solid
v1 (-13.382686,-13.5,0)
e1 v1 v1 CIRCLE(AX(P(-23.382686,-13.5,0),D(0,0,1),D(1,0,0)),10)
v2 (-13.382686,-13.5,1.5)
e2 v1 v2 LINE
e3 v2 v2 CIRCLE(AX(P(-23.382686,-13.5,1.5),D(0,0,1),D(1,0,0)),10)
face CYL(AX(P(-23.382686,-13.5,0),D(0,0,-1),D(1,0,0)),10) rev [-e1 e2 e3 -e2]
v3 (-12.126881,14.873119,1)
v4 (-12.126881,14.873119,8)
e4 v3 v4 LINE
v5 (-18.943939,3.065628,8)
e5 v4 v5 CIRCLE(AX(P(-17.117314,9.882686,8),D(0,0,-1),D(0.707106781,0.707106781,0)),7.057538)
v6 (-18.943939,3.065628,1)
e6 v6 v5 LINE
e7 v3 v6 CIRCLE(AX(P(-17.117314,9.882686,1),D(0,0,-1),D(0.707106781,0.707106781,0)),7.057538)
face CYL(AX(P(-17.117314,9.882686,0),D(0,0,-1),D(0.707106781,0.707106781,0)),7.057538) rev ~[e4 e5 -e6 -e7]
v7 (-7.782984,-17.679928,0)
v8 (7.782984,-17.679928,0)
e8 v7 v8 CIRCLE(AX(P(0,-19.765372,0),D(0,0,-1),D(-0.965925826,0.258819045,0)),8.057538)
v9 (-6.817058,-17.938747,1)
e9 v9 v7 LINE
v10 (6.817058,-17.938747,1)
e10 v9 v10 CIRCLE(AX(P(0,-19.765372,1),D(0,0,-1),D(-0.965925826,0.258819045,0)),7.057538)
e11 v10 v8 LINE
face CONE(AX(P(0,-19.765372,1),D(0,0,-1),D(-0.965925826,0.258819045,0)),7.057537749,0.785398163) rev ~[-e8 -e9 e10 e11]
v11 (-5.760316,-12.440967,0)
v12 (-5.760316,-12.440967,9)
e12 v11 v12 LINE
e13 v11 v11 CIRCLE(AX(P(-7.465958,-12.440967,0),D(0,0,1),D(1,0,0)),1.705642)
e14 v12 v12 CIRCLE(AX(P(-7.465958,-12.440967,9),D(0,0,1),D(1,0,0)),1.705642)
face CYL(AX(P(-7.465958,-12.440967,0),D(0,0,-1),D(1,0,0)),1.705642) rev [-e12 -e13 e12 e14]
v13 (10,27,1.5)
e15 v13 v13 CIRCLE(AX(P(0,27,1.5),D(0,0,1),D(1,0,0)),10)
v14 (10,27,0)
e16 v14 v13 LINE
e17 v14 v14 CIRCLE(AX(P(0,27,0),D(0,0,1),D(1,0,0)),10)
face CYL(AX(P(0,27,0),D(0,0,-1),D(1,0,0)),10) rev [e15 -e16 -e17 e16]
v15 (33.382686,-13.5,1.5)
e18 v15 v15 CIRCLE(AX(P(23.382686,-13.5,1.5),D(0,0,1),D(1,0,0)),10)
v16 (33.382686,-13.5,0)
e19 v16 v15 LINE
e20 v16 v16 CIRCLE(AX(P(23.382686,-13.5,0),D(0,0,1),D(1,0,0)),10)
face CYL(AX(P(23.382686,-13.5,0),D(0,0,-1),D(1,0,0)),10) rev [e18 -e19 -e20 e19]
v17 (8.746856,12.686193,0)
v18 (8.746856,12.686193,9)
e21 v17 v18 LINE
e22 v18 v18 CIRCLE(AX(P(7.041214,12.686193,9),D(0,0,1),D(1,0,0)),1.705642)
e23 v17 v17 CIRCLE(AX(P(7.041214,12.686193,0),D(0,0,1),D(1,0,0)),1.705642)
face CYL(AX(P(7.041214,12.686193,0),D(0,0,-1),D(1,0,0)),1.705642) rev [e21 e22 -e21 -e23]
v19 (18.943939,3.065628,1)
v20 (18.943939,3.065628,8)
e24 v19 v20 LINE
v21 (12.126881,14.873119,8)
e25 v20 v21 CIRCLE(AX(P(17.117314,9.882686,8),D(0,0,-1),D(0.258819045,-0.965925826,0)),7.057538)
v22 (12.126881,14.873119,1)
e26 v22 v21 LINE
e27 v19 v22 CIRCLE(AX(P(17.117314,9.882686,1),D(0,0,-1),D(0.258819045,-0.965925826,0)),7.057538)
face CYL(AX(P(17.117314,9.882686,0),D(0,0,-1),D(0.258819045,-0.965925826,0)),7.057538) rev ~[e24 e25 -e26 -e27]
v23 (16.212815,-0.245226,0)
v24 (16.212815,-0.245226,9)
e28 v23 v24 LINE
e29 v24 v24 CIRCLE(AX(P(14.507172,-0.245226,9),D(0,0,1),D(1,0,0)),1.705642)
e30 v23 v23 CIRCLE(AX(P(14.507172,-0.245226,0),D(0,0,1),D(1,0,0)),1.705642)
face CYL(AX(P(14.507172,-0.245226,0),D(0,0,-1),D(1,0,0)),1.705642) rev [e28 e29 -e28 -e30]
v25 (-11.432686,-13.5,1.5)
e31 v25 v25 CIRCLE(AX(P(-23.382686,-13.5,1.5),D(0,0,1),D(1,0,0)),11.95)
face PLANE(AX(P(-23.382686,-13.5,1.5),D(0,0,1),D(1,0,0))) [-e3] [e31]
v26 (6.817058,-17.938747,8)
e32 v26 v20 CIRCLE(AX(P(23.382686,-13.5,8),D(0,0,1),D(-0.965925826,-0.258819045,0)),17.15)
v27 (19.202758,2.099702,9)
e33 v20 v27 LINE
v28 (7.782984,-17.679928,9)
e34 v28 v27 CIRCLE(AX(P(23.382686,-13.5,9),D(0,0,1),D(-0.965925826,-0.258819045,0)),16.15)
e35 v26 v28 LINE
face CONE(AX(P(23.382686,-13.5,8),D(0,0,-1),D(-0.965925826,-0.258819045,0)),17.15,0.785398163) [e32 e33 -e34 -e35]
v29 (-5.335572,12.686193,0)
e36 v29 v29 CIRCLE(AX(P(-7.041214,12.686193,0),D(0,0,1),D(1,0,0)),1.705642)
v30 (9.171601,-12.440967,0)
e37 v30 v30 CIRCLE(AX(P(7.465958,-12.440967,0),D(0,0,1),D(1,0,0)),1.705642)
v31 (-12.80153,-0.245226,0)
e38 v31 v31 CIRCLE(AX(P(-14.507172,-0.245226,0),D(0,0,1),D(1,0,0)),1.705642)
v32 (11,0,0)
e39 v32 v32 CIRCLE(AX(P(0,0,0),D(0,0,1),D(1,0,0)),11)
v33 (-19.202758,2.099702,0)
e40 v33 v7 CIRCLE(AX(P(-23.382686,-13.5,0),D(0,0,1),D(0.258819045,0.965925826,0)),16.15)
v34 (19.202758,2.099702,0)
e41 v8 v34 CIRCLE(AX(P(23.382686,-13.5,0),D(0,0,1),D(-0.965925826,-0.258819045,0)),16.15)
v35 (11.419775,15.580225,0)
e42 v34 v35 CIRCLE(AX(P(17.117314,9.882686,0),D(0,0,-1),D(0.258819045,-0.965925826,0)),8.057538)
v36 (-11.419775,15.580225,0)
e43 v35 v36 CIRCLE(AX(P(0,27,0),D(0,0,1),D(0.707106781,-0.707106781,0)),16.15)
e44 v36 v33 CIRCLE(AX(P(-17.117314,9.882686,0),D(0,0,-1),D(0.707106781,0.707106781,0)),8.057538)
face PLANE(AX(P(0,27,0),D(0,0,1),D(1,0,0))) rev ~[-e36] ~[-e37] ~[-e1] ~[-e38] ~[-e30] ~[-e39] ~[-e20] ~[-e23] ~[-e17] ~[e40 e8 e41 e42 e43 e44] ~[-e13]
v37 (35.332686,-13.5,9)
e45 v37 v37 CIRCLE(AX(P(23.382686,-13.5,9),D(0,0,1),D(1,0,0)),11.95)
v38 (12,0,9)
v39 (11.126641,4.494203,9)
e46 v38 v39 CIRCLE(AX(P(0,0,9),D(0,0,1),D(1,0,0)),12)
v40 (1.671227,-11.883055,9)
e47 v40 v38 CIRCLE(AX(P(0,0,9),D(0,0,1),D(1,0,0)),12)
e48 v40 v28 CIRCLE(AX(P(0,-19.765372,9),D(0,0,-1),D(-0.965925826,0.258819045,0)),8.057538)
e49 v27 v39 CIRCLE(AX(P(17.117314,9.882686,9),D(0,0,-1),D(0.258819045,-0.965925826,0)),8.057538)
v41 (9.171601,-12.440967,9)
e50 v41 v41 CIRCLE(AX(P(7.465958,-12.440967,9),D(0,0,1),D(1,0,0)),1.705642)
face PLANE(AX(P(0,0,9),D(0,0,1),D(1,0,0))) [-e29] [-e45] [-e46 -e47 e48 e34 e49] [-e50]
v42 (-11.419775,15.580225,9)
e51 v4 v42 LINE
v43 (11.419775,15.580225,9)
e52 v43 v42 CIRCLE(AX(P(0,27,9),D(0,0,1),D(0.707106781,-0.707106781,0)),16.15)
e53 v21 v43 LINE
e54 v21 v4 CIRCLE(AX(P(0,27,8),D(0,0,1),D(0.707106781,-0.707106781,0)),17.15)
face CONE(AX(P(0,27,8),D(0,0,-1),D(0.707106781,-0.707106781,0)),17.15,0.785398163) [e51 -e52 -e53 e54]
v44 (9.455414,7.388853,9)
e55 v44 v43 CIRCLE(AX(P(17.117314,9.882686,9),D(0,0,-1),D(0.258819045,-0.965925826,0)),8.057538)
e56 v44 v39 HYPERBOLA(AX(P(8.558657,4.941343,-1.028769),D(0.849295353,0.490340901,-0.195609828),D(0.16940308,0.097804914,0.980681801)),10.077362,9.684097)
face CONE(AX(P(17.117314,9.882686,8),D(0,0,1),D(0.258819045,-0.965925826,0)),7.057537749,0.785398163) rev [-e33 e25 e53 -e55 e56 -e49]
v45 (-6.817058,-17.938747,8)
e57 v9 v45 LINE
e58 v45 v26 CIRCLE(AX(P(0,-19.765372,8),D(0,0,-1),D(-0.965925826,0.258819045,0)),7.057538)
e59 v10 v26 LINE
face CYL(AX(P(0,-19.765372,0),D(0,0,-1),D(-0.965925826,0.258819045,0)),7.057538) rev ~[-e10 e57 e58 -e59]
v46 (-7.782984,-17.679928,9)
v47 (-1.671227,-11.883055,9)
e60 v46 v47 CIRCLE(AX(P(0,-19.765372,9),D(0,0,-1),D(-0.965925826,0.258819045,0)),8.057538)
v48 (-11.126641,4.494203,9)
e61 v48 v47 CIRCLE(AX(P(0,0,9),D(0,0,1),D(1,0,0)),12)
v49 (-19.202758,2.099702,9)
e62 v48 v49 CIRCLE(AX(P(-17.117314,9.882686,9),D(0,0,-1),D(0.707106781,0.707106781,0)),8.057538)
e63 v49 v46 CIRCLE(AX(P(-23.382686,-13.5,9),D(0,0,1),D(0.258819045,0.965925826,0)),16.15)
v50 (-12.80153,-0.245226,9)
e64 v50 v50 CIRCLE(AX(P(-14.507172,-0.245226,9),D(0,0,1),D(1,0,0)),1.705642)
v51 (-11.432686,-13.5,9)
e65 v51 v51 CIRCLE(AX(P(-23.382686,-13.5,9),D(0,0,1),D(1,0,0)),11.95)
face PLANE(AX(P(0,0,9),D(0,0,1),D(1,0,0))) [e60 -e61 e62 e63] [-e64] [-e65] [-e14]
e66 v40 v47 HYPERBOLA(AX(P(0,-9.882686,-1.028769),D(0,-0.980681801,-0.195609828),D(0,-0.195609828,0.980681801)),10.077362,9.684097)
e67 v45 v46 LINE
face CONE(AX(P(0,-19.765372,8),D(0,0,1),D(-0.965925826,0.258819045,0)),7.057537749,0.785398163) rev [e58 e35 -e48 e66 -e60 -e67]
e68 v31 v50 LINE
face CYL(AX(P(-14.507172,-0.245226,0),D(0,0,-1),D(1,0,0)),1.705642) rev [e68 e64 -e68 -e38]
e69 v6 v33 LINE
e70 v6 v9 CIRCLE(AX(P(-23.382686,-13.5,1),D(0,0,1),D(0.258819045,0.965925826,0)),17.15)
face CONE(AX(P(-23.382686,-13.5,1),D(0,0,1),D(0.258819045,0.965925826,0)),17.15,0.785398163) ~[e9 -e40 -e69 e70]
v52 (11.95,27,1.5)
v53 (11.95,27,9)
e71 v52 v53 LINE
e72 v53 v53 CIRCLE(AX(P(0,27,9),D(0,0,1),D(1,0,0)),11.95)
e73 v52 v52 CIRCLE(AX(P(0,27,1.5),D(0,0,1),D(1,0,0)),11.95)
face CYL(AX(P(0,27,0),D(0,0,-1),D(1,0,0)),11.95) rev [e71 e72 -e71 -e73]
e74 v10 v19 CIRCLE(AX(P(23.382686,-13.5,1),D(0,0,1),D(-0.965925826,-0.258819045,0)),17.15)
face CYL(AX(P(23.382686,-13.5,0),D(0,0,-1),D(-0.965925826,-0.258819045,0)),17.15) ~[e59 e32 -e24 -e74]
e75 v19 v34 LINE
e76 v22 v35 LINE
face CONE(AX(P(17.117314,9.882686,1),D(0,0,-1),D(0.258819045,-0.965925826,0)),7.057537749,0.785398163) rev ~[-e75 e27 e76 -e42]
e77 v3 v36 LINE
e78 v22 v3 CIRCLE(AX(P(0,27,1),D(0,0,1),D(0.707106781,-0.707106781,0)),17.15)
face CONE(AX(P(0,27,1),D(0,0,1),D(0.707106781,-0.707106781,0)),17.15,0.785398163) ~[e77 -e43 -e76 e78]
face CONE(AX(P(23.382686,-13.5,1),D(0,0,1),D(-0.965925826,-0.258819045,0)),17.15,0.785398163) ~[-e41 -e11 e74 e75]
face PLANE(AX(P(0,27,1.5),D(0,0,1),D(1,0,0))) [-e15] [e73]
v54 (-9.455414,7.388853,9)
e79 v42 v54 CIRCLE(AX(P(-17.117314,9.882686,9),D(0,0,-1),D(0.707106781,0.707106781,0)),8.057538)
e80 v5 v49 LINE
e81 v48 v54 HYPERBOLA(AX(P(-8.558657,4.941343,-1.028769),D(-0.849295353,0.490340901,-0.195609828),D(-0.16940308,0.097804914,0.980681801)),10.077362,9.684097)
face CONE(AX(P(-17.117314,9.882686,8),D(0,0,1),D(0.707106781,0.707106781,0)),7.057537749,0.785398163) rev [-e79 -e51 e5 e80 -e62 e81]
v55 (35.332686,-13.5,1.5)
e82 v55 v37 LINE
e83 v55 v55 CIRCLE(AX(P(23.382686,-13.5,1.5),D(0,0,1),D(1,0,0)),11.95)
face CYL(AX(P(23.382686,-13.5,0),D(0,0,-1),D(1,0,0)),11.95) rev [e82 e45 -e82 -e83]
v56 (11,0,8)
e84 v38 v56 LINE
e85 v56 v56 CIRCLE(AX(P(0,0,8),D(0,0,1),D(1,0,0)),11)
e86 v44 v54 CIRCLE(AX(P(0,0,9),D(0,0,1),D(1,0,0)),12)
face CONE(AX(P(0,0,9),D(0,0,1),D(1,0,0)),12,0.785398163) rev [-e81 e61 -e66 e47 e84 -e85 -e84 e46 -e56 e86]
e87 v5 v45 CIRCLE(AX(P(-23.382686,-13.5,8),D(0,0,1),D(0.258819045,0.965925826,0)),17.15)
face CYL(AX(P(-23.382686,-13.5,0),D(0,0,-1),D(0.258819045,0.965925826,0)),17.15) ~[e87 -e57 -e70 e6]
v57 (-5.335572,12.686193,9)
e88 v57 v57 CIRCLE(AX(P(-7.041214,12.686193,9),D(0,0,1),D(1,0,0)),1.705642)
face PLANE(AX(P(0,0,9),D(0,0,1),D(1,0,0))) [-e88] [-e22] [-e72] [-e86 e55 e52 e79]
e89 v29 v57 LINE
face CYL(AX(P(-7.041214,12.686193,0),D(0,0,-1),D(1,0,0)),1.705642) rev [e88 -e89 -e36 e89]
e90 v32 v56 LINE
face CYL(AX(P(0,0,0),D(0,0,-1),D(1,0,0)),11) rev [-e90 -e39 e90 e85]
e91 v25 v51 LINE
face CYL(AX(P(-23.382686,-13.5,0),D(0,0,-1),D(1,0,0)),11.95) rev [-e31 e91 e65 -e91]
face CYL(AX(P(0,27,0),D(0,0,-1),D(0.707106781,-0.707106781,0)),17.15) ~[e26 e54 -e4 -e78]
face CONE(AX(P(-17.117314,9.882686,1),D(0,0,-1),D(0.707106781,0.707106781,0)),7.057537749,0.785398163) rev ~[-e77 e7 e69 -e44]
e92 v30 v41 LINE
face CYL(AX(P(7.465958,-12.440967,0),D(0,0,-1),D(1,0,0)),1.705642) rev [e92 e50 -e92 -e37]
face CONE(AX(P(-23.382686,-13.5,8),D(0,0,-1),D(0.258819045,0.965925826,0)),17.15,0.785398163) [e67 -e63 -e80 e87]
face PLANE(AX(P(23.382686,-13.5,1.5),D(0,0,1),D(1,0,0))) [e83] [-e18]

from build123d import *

# Parameters (mm, degrees)
F0_R     = 11.95
F0_R_2   = 1.705642275
F0_R_3   = 11
F1_DEPTH = 9
F2_SIZE  = 1
F0_R_4   = 10
F3_DEPTH = 1.5


# Not quite as in the source:
# - a fillet or chamfer that OpenCascade refuses, or shapes differently, is made with other operations: its cross-section is extruded or revolved along the edge and cut away or added


with BuildPart() as f1:
    # F0 (on Top) → F1 (new body)
    with BuildSketch(Plane.XY):
        with BuildLine():
            ThreePointArc((18.9439392787, 3.0656279209), (11.0053071194, 6.3539170279), (12.1268812973, 14.8731187027))
            ThreePointArc((12.1268812973, 14.8731187027), (0, 44.15), (-12.1268812973, 14.8731187027))
            ThreePointArc((-12.1268812973, 14.8731187027), (-11.0053071194, 6.3539170279), (-18.9439392787, 3.0656279209))
            ThreePointArc((-18.9439392787, 3.0656279209), (-38.2350215771, -22.075), (-6.8170579813, -17.9387466235))
            ThreePointArc((-6.8170579813, -17.9387466235), (0, -12.7078340558), (6.8170579813, -17.9387466235))
            ThreePointArc((6.8170579813, -17.9387466235), (38.2350215771, -22.075), (18.9439392787, 3.0656279209))
        make_face()
        with Locations((-23.3826859022, -13.5)):
            Circle(F0_R, mode=Mode.SUBTRACT)
        with Locations((-7.4659583891, -12.4409667216)):
            Circle(F0_R_2, mode=Mode.SUBTRACT)
        with Locations((-14.5071724231, -0.2452262678)):
            Circle(F0_R_2, mode=Mode.SUBTRACT)
        with Locations((7.4659583891, -12.4409667216)):
            Circle(F0_R_2, mode=Mode.SUBTRACT)
        with Locations((23.3826859022, -13.5)):
            Circle(F0_R, mode=Mode.SUBTRACT)
        Circle(F0_R_3, mode=Mode.SUBTRACT)
        with Locations((14.5071724231, -0.2452262678)):
            Circle(F0_R_2, mode=Mode.SUBTRACT)
        with Locations((-7.041214034, 12.6861929893)):
            Circle(F0_R_2, mode=Mode.SUBTRACT)
        with Locations((7.041214034, 12.6861929893)):
            Circle(F0_R_2, mode=Mode.SUBTRACT)
        with Locations((0, 27)):
            Circle(F0_R, mode=Mode.SUBTRACT)
    extrude(amount=F1_DEPTH)

    # F2
    f2_edges = [f1.edges().sort_by_distance(p)[0] for p in [
        (-38.235022, -22.075, 9),
        (0, -12.707834, 9),
        (38.235022, -22.075, 9),
        (38.235022, -22.075, 0),
        (0, -12.707834, 0),
        (-38.235022, -22.075, 0),
        (-11.005307, 6.353917, 9),
        (-11.005307, 6.353917, 0),
        (0, 44.15, 0),
        (0, 44.15, 9),
        (11.005307, 6.353917, 9),
        (11.005307, 6.353917, 0),
    ]]
    chamfer(f2_edges, length=F2_SIZE)

    # F0 (on Top) → F3 (join)
    with BuildSketch(Plane.XY):
        with Locations((0, 27)):
            Circle(F0_R)
        with Locations((0, 27)):
            Circle(F0_R_4, mode=Mode.SUBTRACT)
        with Locations((-23.3826859022, -13.5)):
            Circle(F0_R)
        with Locations((-23.3826859022, -13.5)):
            Circle(F0_R_4, mode=Mode.SUBTRACT)
        with Locations((23.3826859022, -13.5)):
            Circle(F0_R)
        with Locations((23.3826859022, -13.5)):
            Circle(F0_R_4, mode=Mode.SUBTRACT)
    extrude(amount=F3_DEPTH)

    # F4: chamfer of 1 on 1 edges, made by hand

    # F4_s1 → F4_t2 (revolve, cut)
    with BuildSketch(Plane.XZ):
        Polygon((12, 9), (11, 8), (11, 9), align=None)
    revolve(axis=Axis((0, 0, 9), (0, 0, 1)), mode=Mode.SUBTRACT)


solid = f1.part
